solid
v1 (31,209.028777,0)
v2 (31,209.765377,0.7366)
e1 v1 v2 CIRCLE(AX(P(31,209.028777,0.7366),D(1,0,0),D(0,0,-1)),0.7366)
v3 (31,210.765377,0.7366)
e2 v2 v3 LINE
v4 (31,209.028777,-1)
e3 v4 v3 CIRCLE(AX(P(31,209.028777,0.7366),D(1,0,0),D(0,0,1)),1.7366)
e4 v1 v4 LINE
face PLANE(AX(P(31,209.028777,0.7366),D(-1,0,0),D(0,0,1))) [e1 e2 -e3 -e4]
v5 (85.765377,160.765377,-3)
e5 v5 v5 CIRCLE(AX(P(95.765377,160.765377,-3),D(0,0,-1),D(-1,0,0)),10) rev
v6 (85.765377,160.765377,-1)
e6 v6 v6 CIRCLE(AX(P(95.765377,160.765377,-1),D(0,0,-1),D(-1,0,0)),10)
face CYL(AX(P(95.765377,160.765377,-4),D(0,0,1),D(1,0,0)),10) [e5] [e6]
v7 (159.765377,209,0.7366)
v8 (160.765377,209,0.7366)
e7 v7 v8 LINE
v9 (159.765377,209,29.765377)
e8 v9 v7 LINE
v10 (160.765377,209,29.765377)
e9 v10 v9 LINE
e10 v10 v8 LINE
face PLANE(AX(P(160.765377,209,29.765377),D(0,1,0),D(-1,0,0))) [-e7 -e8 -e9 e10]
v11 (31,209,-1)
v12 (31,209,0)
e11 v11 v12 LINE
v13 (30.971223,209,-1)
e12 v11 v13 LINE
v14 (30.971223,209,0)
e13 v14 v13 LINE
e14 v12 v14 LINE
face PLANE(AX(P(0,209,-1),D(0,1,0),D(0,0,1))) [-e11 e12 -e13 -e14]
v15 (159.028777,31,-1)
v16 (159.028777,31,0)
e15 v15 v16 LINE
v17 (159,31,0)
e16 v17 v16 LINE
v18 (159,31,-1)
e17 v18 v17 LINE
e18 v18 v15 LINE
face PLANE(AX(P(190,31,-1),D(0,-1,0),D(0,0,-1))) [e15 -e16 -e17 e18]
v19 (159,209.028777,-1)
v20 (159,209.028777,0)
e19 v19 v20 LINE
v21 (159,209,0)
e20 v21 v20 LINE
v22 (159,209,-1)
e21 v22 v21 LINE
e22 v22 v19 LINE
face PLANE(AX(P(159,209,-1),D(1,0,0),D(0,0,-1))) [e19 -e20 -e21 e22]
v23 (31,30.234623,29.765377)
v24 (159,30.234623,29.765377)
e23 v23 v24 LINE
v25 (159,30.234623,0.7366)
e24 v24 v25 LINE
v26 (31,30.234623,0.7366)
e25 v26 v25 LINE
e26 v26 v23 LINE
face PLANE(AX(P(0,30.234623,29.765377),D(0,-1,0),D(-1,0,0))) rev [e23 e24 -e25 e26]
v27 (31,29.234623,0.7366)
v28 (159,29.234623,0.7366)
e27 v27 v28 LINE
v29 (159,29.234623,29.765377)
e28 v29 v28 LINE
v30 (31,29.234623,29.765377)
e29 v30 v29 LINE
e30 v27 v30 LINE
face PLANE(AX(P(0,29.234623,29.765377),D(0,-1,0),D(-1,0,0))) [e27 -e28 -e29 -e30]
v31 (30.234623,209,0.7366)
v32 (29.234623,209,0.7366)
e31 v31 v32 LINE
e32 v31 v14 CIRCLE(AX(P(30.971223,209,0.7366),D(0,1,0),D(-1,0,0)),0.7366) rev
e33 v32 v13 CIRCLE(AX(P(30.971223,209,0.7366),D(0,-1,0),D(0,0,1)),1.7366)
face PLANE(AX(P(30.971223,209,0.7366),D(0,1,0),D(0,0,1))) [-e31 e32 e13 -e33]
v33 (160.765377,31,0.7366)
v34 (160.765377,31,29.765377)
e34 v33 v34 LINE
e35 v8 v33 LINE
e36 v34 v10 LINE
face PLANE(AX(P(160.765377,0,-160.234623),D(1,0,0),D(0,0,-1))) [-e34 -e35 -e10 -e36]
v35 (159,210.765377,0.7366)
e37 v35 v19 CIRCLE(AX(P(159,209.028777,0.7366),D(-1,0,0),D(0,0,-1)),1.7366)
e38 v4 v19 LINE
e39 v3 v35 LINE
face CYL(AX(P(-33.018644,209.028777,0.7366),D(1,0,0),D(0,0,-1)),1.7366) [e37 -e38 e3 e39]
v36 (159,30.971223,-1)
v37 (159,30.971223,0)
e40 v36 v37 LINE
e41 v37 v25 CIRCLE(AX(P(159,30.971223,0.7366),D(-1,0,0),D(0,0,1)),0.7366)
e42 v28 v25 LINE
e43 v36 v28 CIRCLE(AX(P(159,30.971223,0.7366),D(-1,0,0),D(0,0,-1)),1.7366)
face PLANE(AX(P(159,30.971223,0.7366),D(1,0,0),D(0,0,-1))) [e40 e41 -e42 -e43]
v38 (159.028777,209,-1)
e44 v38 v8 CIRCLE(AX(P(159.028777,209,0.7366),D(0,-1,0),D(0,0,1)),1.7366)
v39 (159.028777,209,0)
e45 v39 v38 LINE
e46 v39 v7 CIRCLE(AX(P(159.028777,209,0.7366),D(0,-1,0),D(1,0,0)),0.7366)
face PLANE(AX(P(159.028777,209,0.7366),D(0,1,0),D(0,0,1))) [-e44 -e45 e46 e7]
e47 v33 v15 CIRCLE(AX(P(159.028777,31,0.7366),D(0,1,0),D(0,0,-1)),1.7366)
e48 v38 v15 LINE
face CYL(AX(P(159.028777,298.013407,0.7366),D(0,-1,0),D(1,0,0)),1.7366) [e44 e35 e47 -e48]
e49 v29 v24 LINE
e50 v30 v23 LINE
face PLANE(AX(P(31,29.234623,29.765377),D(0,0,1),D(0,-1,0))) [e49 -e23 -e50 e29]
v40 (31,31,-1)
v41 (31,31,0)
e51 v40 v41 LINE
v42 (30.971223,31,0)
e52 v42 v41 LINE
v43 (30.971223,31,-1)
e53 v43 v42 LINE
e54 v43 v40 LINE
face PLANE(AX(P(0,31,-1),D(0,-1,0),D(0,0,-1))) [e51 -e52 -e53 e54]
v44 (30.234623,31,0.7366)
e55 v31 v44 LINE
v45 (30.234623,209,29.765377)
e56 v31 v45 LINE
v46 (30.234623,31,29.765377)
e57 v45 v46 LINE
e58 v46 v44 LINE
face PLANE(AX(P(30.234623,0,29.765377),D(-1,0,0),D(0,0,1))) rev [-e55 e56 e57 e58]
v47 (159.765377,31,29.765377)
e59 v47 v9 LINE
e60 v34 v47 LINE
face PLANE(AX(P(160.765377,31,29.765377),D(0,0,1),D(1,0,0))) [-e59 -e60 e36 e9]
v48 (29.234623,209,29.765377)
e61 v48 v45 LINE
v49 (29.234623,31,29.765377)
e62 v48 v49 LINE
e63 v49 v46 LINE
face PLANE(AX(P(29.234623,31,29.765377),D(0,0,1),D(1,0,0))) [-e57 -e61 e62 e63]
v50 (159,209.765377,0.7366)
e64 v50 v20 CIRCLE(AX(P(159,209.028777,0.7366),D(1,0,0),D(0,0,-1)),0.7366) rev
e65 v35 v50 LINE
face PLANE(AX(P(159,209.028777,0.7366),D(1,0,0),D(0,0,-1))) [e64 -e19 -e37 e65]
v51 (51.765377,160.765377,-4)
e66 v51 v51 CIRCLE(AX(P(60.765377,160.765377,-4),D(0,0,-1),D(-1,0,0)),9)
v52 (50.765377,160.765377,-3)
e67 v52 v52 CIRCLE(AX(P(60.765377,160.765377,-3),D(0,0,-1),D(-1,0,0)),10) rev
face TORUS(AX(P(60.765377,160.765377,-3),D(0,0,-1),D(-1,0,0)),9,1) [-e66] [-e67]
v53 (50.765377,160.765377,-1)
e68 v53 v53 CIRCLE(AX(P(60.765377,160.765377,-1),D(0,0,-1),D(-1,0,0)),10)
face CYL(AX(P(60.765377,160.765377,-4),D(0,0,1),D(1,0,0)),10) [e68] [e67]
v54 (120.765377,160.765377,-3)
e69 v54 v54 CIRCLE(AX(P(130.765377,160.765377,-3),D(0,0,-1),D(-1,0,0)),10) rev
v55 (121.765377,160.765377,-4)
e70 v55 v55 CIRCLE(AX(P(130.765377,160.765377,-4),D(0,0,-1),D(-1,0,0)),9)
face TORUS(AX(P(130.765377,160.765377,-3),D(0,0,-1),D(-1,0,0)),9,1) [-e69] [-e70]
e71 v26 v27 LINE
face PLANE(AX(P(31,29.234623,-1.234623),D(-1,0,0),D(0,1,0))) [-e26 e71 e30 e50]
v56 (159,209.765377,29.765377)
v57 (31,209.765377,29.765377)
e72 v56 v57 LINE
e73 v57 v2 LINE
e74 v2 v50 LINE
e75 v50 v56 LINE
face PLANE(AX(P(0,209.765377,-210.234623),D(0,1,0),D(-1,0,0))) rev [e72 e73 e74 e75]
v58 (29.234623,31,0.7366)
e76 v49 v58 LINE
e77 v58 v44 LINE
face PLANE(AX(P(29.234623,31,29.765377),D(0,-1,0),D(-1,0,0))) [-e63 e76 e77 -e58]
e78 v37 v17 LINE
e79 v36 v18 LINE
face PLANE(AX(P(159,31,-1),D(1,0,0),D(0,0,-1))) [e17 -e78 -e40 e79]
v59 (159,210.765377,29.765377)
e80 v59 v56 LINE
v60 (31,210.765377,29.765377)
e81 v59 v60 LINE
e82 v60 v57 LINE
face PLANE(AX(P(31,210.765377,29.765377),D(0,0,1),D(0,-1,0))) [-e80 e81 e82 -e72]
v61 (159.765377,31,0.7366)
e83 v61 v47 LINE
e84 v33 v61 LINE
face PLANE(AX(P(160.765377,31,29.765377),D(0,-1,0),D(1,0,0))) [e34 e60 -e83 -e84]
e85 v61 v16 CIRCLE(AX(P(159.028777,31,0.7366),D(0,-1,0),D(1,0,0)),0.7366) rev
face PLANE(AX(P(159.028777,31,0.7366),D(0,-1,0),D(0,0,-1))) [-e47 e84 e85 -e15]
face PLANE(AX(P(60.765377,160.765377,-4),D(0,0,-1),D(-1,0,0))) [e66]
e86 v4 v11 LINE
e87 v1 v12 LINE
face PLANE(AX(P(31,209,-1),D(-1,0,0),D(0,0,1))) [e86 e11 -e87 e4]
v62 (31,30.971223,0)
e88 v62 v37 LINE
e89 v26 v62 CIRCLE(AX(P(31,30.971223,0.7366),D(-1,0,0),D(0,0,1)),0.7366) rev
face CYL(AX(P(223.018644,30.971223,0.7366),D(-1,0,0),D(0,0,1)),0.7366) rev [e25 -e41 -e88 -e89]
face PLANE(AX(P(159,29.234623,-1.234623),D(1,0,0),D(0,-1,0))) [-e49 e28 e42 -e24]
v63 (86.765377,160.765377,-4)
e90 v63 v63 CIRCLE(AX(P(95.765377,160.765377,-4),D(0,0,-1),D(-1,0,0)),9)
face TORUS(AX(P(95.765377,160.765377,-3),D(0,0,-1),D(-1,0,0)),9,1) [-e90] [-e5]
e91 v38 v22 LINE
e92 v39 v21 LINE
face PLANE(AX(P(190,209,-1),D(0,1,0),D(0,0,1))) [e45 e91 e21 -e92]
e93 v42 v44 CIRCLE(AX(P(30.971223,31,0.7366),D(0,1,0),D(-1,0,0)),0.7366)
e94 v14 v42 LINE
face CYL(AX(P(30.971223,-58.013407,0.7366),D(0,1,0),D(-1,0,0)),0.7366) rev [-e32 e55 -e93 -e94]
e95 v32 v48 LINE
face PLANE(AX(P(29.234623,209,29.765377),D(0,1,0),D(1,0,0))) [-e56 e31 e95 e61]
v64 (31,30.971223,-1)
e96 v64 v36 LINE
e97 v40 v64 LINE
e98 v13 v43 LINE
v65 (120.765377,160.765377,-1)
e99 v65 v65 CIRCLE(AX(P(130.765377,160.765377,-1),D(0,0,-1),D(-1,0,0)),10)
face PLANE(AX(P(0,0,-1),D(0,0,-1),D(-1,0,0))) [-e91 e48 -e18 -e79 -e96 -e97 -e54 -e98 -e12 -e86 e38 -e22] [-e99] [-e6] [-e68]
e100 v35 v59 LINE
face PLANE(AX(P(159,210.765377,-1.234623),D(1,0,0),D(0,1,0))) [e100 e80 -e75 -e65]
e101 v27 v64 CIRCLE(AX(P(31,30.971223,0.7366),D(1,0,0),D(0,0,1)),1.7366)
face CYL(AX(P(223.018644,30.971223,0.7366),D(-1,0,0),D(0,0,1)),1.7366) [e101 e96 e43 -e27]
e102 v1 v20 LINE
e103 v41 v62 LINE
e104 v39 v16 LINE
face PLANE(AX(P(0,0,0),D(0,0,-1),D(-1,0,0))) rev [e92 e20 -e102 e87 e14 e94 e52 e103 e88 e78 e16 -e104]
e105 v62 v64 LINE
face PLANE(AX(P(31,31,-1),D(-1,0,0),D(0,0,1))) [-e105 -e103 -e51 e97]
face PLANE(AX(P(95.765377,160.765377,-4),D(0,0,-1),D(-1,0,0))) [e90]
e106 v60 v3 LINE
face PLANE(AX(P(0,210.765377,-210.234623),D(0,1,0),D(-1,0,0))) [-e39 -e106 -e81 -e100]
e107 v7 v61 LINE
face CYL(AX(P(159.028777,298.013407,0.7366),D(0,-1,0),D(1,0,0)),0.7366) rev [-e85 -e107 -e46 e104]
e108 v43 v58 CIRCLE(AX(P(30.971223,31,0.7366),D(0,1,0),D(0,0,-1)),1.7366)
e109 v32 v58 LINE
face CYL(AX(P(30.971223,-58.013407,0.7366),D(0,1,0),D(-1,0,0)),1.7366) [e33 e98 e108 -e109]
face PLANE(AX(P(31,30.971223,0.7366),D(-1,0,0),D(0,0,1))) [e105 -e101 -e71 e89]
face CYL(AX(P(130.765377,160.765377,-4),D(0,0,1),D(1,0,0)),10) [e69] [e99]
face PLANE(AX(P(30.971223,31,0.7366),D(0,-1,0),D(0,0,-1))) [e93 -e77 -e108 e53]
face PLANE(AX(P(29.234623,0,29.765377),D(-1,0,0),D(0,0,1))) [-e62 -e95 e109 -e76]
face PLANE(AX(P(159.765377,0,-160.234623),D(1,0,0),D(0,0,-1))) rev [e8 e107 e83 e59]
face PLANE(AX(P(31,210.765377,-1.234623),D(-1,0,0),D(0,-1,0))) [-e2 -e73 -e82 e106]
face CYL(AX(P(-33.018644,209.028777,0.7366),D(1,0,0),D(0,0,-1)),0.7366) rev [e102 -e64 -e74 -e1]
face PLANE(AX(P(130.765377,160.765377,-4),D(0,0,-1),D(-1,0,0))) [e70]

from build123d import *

# Parameters (mm, degrees)
BASE_FLANGE1_DEPTH         = 1
SKETCHED_START             = 31
SKETCHED_BEND1_DEPTH       = 178
SKETCHED_BEND1_2_DEPTH     = 128
SKETCHED_BEND1_3_DEPTH     = 178
SKETCHED_BEND1_4_OUTLINE_W = 128
SKETCHED_BEND1_4_OUTLINE_H = 1
SKETCHED_BEND1_4_DEPTH     = 29.234623369
SKETCHED_START_2           = 210.765376631
SKETCHED_BEND1_5_OUTLINE_W = 128
SKETCHED_BEND1_5_OUTLINE_H = 1
SKETCHED_BEND1_5_DEPTH     = 29.234623369
SKETCHED_BEND1_6_DEPTH     = 128
SKETCHED_BEND1_7_OUTLINE_W = 178
SKETCHED_BEND1_7_OUTLINE_H = 1
SKETCHED_BEND1_7_DEPTH     = 29.234623369
SKETCHED_START_3           = 160.765376631
SKETCHED_BEND1_8_OUTLINE_W = 178
SKETCHED_BEND1_8_OUTLINE_H = 1
SKETCHED_BEND1_8_DEPTH     = 29.234623369
SKETCH7_R                  = 10
BOSS_EXTRUDE1_DEPTH        = 3
FILLET1_R                  = 1


# Read off the part's stored shape, not the designer's step: Sketched Bend1
# Sheet-metal steps are written as plain solids
with BuildPart() as part:
    # Sketch1 → Base-Flange1 (new body)
    with BuildSketch(Plane.XY):
        Polygon((0, 209), (31, 209), (31, 240), (159, 240), (159, 209), (190, 209), (190, 31), (159, 31), (159, 0), (31, 0), (31, 31), (0, 31), align=None)
    extrude(amount=-BASE_FLANGE1_DEPTH)

    # Sketched Bend1 outline → Sketched Bend1 (add)
    with BuildSketch(Plane(origin=(0, 0, 0), x_dir=(1, 0, 0), z_dir=(0, 1, 0)).offset(SKETCHED_START)):
        with BuildLine():
            Line((29.234623369, -0.7366), (29.234623369, -29.765376631))
            Line((29.234623369, -29.765376631), (30.234623369, -29.765376631))
            Line((30.234623369, -29.765376631), (30.234623369, -0.7366))
            ThreePointArc((30.234623369, -0.7366), (30.450368514, -0.215745145), (30.971223369, 0))
            Line((30.971223369, 0), (29.398582279, 0))
            ThreePointArc((29.398582279, 0), (29.276108612, -0.359286442), (29.234623369, -0.7366))
        make_face()
        with BuildLine():
            Line((160.601417721, 0), (159.028776631, 0))
            ThreePointArc((159.028776631, 0), (159.549631486, -0.215745145), (159.765376631, -0.7366))
            Line((159.765376631, -0.7366), (159.765376631, -29.765376631))
            Line((159.765376631, -29.765376631), (160.765376631, -29.765376631))
            Line((160.765376631, -29.765376631), (160.765376631, -0.7366))
            ThreePointArc((160.765376631, -0.7366), (160.723891388, -0.359286442), (160.601417721, 0))
        make_face()
    extrude(amount=SKETCHED_BEND1_DEPTH)

    # Sketched Bend1 2 outline → Sketched Bend1 2 (add)
    with BuildSketch(Plane.YZ.offset(SKETCHED_START)):
        with BuildLine():
            Line((209.028776631, 0), (210.601417721, 0))
            ThreePointArc((210.601417721, 0), (210.723891388, 0.359286442), (210.765376631, 0.7366))
            Line((210.765376631, 0.7366), (210.765376631, 29.765376631))
            Line((210.765376631, 29.765376631), (209.765376631, 29.765376631))
            Line((209.765376631, 29.765376631), (209.765376631, 0.7366))
            ThreePointArc((209.765376631, 0.7366), (209.549631486, 0.215745145), (209.028776631, 0))
        make_face()
        with BuildLine():
            ThreePointArc((29.234623369, 0.7366), (29.276108612, 0.359286442), (29.398582279, 0))
            Line((29.398582279, 0), (30.971223369, 0))
            ThreePointArc((30.971223369, 0), (30.450368514, 0.215745145), (30.234623369, 0.7366))
            Line((30.234623369, 0.7366), (30.234623369, 29.765376631))
            Line((30.234623369, 29.765376631), (29.234623369, 29.765376631))
            Line((29.234623369, 29.765376631), (29.234623369, 0.7366))
        make_face()
    extrude(amount=SKETCHED_BEND1_2_DEPTH)

    # Sketched Bend1 3 outline → Sketched Bend1 3 (cut)
    with BuildSketch(Plane(origin=(0, 0, 0), x_dir=(1, 0, 0), z_dir=(0, 1, 0)).offset(SKETCHED_START)):
        with BuildLine():
            Line((0, 0), (29.398582279, 0))
            ThreePointArc((29.398582279, 0), (30.039397205, 0.728828115), (30.971223369, 1))
            Line((30.971223369, 1), (0, 1))
            Line((0, 1), (0, 0))
        make_face()
        with BuildLine():
            Line((190, 1), (159.028776631, 1))
            ThreePointArc((159.028776631, 1), (159.960602795, 0.728828115), (160.601417721, 0))
            Line((160.601417721, 0), (190, 0))
            Line((190, 0), (190, 1))
        make_face()
    extrude(amount=SKETCHED_BEND1_3_DEPTH, mode=Mode.SUBTRACT)

    # Sketched Bend1 4 outline → Sketched Bend1 4 (cut)
    with BuildSketch(Plane(origin=(0, 0, 0), x_dir=(1, 0, 0), z_dir=(0, 1, 0))):
        with Locations((95, 0.5)):
            Rectangle(SKETCHED_BEND1_4_OUTLINE_W, SKETCHED_BEND1_4_OUTLINE_H)
    extrude(amount=SKETCHED_BEND1_4_DEPTH, mode=Mode.SUBTRACT)

    # Sketched Bend1 5 outline → Sketched Bend1 5 (cut)
    with BuildSketch(Plane(origin=(0, 0, 0), x_dir=(1, 0, 0), z_dir=(0, 1, 0)).offset(SKETCHED_START_2)):
        with Locations((95, 0.5)):
            Rectangle(SKETCHED_BEND1_5_OUTLINE_W, SKETCHED_BEND1_5_OUTLINE_H)
    extrude(amount=SKETCHED_BEND1_5_DEPTH, mode=Mode.SUBTRACT)

    # Sketched Bend1 6 outline → Sketched Bend1 6 (cut)
    with BuildSketch(Plane.YZ.offset(SKETCHED_START)):
        with BuildLine():
            ThreePointArc((210.601417721, 0), (209.960602795, -0.728828115), (209.028776631, -1))
            Line((209.028776631, -1), (240, -1))
            Line((240, -1), (240, 0))
            Line((240, 0), (210.601417721, 0))
        make_face()
        with BuildLine():
            Line((0, -1), (30.971223369, -1))
            ThreePointArc((30.971223369, -1), (30.039397205, -0.728828115), (29.398582279, 0))
            Line((29.398582279, 0), (0, 0))
            Line((0, 0), (0, -1))
        make_face()
    extrude(amount=SKETCHED_BEND1_6_DEPTH, mode=Mode.SUBTRACT)

    # Sketched Bend1 7 outline → Sketched Bend1 7 (cut)
    with BuildSketch(Plane.YZ):
        with Locations((120, -0.5)):
            Rectangle(SKETCHED_BEND1_7_OUTLINE_W, SKETCHED_BEND1_7_OUTLINE_H)
    extrude(amount=SKETCHED_BEND1_7_DEPTH, mode=Mode.SUBTRACT)

    # Sketched Bend1 8 outline → Sketched Bend1 8 (cut)
    with BuildSketch(Plane.YZ.offset(SKETCHED_START_3)):
        with Locations((120, -0.5)):
            Rectangle(SKETCHED_BEND1_8_OUTLINE_W, SKETCHED_BEND1_8_OUTLINE_H)
    extrude(amount=SKETCHED_BEND1_8_DEPTH, mode=Mode.SUBTRACT)

    # Sketch7 → Boss-Extrude1 (add)
    with BuildSketch(Plane(origin=(0, 0, -1), x_dir=(-1, 0, 0), z_dir=(0, 0, -1))):
        with Locations((-130.765376631, 160.765376631)):
            Circle(SKETCH7_R)
        with Locations((-95.765376631, 160.765376631)):
            Circle(SKETCH7_R)
        with Locations((-60.765376631, 160.765376631)):
            Circle(SKETCH7_R)
    extrude(amount=BOSS_EXTRUDE1_DEPTH)

    # Fillet1
    fillet1_edges = [part.edges().sort_by_distance(p)[0] for p in [
        (140.765376631, 160.765376631, -4),
        (105.765376631, 160.765376631, -4),
        (70.765376631, 160.765376631, -4),
    ]]
    fillet(fillet1_edges, radius=FILLET1_R)


solid = part.part
